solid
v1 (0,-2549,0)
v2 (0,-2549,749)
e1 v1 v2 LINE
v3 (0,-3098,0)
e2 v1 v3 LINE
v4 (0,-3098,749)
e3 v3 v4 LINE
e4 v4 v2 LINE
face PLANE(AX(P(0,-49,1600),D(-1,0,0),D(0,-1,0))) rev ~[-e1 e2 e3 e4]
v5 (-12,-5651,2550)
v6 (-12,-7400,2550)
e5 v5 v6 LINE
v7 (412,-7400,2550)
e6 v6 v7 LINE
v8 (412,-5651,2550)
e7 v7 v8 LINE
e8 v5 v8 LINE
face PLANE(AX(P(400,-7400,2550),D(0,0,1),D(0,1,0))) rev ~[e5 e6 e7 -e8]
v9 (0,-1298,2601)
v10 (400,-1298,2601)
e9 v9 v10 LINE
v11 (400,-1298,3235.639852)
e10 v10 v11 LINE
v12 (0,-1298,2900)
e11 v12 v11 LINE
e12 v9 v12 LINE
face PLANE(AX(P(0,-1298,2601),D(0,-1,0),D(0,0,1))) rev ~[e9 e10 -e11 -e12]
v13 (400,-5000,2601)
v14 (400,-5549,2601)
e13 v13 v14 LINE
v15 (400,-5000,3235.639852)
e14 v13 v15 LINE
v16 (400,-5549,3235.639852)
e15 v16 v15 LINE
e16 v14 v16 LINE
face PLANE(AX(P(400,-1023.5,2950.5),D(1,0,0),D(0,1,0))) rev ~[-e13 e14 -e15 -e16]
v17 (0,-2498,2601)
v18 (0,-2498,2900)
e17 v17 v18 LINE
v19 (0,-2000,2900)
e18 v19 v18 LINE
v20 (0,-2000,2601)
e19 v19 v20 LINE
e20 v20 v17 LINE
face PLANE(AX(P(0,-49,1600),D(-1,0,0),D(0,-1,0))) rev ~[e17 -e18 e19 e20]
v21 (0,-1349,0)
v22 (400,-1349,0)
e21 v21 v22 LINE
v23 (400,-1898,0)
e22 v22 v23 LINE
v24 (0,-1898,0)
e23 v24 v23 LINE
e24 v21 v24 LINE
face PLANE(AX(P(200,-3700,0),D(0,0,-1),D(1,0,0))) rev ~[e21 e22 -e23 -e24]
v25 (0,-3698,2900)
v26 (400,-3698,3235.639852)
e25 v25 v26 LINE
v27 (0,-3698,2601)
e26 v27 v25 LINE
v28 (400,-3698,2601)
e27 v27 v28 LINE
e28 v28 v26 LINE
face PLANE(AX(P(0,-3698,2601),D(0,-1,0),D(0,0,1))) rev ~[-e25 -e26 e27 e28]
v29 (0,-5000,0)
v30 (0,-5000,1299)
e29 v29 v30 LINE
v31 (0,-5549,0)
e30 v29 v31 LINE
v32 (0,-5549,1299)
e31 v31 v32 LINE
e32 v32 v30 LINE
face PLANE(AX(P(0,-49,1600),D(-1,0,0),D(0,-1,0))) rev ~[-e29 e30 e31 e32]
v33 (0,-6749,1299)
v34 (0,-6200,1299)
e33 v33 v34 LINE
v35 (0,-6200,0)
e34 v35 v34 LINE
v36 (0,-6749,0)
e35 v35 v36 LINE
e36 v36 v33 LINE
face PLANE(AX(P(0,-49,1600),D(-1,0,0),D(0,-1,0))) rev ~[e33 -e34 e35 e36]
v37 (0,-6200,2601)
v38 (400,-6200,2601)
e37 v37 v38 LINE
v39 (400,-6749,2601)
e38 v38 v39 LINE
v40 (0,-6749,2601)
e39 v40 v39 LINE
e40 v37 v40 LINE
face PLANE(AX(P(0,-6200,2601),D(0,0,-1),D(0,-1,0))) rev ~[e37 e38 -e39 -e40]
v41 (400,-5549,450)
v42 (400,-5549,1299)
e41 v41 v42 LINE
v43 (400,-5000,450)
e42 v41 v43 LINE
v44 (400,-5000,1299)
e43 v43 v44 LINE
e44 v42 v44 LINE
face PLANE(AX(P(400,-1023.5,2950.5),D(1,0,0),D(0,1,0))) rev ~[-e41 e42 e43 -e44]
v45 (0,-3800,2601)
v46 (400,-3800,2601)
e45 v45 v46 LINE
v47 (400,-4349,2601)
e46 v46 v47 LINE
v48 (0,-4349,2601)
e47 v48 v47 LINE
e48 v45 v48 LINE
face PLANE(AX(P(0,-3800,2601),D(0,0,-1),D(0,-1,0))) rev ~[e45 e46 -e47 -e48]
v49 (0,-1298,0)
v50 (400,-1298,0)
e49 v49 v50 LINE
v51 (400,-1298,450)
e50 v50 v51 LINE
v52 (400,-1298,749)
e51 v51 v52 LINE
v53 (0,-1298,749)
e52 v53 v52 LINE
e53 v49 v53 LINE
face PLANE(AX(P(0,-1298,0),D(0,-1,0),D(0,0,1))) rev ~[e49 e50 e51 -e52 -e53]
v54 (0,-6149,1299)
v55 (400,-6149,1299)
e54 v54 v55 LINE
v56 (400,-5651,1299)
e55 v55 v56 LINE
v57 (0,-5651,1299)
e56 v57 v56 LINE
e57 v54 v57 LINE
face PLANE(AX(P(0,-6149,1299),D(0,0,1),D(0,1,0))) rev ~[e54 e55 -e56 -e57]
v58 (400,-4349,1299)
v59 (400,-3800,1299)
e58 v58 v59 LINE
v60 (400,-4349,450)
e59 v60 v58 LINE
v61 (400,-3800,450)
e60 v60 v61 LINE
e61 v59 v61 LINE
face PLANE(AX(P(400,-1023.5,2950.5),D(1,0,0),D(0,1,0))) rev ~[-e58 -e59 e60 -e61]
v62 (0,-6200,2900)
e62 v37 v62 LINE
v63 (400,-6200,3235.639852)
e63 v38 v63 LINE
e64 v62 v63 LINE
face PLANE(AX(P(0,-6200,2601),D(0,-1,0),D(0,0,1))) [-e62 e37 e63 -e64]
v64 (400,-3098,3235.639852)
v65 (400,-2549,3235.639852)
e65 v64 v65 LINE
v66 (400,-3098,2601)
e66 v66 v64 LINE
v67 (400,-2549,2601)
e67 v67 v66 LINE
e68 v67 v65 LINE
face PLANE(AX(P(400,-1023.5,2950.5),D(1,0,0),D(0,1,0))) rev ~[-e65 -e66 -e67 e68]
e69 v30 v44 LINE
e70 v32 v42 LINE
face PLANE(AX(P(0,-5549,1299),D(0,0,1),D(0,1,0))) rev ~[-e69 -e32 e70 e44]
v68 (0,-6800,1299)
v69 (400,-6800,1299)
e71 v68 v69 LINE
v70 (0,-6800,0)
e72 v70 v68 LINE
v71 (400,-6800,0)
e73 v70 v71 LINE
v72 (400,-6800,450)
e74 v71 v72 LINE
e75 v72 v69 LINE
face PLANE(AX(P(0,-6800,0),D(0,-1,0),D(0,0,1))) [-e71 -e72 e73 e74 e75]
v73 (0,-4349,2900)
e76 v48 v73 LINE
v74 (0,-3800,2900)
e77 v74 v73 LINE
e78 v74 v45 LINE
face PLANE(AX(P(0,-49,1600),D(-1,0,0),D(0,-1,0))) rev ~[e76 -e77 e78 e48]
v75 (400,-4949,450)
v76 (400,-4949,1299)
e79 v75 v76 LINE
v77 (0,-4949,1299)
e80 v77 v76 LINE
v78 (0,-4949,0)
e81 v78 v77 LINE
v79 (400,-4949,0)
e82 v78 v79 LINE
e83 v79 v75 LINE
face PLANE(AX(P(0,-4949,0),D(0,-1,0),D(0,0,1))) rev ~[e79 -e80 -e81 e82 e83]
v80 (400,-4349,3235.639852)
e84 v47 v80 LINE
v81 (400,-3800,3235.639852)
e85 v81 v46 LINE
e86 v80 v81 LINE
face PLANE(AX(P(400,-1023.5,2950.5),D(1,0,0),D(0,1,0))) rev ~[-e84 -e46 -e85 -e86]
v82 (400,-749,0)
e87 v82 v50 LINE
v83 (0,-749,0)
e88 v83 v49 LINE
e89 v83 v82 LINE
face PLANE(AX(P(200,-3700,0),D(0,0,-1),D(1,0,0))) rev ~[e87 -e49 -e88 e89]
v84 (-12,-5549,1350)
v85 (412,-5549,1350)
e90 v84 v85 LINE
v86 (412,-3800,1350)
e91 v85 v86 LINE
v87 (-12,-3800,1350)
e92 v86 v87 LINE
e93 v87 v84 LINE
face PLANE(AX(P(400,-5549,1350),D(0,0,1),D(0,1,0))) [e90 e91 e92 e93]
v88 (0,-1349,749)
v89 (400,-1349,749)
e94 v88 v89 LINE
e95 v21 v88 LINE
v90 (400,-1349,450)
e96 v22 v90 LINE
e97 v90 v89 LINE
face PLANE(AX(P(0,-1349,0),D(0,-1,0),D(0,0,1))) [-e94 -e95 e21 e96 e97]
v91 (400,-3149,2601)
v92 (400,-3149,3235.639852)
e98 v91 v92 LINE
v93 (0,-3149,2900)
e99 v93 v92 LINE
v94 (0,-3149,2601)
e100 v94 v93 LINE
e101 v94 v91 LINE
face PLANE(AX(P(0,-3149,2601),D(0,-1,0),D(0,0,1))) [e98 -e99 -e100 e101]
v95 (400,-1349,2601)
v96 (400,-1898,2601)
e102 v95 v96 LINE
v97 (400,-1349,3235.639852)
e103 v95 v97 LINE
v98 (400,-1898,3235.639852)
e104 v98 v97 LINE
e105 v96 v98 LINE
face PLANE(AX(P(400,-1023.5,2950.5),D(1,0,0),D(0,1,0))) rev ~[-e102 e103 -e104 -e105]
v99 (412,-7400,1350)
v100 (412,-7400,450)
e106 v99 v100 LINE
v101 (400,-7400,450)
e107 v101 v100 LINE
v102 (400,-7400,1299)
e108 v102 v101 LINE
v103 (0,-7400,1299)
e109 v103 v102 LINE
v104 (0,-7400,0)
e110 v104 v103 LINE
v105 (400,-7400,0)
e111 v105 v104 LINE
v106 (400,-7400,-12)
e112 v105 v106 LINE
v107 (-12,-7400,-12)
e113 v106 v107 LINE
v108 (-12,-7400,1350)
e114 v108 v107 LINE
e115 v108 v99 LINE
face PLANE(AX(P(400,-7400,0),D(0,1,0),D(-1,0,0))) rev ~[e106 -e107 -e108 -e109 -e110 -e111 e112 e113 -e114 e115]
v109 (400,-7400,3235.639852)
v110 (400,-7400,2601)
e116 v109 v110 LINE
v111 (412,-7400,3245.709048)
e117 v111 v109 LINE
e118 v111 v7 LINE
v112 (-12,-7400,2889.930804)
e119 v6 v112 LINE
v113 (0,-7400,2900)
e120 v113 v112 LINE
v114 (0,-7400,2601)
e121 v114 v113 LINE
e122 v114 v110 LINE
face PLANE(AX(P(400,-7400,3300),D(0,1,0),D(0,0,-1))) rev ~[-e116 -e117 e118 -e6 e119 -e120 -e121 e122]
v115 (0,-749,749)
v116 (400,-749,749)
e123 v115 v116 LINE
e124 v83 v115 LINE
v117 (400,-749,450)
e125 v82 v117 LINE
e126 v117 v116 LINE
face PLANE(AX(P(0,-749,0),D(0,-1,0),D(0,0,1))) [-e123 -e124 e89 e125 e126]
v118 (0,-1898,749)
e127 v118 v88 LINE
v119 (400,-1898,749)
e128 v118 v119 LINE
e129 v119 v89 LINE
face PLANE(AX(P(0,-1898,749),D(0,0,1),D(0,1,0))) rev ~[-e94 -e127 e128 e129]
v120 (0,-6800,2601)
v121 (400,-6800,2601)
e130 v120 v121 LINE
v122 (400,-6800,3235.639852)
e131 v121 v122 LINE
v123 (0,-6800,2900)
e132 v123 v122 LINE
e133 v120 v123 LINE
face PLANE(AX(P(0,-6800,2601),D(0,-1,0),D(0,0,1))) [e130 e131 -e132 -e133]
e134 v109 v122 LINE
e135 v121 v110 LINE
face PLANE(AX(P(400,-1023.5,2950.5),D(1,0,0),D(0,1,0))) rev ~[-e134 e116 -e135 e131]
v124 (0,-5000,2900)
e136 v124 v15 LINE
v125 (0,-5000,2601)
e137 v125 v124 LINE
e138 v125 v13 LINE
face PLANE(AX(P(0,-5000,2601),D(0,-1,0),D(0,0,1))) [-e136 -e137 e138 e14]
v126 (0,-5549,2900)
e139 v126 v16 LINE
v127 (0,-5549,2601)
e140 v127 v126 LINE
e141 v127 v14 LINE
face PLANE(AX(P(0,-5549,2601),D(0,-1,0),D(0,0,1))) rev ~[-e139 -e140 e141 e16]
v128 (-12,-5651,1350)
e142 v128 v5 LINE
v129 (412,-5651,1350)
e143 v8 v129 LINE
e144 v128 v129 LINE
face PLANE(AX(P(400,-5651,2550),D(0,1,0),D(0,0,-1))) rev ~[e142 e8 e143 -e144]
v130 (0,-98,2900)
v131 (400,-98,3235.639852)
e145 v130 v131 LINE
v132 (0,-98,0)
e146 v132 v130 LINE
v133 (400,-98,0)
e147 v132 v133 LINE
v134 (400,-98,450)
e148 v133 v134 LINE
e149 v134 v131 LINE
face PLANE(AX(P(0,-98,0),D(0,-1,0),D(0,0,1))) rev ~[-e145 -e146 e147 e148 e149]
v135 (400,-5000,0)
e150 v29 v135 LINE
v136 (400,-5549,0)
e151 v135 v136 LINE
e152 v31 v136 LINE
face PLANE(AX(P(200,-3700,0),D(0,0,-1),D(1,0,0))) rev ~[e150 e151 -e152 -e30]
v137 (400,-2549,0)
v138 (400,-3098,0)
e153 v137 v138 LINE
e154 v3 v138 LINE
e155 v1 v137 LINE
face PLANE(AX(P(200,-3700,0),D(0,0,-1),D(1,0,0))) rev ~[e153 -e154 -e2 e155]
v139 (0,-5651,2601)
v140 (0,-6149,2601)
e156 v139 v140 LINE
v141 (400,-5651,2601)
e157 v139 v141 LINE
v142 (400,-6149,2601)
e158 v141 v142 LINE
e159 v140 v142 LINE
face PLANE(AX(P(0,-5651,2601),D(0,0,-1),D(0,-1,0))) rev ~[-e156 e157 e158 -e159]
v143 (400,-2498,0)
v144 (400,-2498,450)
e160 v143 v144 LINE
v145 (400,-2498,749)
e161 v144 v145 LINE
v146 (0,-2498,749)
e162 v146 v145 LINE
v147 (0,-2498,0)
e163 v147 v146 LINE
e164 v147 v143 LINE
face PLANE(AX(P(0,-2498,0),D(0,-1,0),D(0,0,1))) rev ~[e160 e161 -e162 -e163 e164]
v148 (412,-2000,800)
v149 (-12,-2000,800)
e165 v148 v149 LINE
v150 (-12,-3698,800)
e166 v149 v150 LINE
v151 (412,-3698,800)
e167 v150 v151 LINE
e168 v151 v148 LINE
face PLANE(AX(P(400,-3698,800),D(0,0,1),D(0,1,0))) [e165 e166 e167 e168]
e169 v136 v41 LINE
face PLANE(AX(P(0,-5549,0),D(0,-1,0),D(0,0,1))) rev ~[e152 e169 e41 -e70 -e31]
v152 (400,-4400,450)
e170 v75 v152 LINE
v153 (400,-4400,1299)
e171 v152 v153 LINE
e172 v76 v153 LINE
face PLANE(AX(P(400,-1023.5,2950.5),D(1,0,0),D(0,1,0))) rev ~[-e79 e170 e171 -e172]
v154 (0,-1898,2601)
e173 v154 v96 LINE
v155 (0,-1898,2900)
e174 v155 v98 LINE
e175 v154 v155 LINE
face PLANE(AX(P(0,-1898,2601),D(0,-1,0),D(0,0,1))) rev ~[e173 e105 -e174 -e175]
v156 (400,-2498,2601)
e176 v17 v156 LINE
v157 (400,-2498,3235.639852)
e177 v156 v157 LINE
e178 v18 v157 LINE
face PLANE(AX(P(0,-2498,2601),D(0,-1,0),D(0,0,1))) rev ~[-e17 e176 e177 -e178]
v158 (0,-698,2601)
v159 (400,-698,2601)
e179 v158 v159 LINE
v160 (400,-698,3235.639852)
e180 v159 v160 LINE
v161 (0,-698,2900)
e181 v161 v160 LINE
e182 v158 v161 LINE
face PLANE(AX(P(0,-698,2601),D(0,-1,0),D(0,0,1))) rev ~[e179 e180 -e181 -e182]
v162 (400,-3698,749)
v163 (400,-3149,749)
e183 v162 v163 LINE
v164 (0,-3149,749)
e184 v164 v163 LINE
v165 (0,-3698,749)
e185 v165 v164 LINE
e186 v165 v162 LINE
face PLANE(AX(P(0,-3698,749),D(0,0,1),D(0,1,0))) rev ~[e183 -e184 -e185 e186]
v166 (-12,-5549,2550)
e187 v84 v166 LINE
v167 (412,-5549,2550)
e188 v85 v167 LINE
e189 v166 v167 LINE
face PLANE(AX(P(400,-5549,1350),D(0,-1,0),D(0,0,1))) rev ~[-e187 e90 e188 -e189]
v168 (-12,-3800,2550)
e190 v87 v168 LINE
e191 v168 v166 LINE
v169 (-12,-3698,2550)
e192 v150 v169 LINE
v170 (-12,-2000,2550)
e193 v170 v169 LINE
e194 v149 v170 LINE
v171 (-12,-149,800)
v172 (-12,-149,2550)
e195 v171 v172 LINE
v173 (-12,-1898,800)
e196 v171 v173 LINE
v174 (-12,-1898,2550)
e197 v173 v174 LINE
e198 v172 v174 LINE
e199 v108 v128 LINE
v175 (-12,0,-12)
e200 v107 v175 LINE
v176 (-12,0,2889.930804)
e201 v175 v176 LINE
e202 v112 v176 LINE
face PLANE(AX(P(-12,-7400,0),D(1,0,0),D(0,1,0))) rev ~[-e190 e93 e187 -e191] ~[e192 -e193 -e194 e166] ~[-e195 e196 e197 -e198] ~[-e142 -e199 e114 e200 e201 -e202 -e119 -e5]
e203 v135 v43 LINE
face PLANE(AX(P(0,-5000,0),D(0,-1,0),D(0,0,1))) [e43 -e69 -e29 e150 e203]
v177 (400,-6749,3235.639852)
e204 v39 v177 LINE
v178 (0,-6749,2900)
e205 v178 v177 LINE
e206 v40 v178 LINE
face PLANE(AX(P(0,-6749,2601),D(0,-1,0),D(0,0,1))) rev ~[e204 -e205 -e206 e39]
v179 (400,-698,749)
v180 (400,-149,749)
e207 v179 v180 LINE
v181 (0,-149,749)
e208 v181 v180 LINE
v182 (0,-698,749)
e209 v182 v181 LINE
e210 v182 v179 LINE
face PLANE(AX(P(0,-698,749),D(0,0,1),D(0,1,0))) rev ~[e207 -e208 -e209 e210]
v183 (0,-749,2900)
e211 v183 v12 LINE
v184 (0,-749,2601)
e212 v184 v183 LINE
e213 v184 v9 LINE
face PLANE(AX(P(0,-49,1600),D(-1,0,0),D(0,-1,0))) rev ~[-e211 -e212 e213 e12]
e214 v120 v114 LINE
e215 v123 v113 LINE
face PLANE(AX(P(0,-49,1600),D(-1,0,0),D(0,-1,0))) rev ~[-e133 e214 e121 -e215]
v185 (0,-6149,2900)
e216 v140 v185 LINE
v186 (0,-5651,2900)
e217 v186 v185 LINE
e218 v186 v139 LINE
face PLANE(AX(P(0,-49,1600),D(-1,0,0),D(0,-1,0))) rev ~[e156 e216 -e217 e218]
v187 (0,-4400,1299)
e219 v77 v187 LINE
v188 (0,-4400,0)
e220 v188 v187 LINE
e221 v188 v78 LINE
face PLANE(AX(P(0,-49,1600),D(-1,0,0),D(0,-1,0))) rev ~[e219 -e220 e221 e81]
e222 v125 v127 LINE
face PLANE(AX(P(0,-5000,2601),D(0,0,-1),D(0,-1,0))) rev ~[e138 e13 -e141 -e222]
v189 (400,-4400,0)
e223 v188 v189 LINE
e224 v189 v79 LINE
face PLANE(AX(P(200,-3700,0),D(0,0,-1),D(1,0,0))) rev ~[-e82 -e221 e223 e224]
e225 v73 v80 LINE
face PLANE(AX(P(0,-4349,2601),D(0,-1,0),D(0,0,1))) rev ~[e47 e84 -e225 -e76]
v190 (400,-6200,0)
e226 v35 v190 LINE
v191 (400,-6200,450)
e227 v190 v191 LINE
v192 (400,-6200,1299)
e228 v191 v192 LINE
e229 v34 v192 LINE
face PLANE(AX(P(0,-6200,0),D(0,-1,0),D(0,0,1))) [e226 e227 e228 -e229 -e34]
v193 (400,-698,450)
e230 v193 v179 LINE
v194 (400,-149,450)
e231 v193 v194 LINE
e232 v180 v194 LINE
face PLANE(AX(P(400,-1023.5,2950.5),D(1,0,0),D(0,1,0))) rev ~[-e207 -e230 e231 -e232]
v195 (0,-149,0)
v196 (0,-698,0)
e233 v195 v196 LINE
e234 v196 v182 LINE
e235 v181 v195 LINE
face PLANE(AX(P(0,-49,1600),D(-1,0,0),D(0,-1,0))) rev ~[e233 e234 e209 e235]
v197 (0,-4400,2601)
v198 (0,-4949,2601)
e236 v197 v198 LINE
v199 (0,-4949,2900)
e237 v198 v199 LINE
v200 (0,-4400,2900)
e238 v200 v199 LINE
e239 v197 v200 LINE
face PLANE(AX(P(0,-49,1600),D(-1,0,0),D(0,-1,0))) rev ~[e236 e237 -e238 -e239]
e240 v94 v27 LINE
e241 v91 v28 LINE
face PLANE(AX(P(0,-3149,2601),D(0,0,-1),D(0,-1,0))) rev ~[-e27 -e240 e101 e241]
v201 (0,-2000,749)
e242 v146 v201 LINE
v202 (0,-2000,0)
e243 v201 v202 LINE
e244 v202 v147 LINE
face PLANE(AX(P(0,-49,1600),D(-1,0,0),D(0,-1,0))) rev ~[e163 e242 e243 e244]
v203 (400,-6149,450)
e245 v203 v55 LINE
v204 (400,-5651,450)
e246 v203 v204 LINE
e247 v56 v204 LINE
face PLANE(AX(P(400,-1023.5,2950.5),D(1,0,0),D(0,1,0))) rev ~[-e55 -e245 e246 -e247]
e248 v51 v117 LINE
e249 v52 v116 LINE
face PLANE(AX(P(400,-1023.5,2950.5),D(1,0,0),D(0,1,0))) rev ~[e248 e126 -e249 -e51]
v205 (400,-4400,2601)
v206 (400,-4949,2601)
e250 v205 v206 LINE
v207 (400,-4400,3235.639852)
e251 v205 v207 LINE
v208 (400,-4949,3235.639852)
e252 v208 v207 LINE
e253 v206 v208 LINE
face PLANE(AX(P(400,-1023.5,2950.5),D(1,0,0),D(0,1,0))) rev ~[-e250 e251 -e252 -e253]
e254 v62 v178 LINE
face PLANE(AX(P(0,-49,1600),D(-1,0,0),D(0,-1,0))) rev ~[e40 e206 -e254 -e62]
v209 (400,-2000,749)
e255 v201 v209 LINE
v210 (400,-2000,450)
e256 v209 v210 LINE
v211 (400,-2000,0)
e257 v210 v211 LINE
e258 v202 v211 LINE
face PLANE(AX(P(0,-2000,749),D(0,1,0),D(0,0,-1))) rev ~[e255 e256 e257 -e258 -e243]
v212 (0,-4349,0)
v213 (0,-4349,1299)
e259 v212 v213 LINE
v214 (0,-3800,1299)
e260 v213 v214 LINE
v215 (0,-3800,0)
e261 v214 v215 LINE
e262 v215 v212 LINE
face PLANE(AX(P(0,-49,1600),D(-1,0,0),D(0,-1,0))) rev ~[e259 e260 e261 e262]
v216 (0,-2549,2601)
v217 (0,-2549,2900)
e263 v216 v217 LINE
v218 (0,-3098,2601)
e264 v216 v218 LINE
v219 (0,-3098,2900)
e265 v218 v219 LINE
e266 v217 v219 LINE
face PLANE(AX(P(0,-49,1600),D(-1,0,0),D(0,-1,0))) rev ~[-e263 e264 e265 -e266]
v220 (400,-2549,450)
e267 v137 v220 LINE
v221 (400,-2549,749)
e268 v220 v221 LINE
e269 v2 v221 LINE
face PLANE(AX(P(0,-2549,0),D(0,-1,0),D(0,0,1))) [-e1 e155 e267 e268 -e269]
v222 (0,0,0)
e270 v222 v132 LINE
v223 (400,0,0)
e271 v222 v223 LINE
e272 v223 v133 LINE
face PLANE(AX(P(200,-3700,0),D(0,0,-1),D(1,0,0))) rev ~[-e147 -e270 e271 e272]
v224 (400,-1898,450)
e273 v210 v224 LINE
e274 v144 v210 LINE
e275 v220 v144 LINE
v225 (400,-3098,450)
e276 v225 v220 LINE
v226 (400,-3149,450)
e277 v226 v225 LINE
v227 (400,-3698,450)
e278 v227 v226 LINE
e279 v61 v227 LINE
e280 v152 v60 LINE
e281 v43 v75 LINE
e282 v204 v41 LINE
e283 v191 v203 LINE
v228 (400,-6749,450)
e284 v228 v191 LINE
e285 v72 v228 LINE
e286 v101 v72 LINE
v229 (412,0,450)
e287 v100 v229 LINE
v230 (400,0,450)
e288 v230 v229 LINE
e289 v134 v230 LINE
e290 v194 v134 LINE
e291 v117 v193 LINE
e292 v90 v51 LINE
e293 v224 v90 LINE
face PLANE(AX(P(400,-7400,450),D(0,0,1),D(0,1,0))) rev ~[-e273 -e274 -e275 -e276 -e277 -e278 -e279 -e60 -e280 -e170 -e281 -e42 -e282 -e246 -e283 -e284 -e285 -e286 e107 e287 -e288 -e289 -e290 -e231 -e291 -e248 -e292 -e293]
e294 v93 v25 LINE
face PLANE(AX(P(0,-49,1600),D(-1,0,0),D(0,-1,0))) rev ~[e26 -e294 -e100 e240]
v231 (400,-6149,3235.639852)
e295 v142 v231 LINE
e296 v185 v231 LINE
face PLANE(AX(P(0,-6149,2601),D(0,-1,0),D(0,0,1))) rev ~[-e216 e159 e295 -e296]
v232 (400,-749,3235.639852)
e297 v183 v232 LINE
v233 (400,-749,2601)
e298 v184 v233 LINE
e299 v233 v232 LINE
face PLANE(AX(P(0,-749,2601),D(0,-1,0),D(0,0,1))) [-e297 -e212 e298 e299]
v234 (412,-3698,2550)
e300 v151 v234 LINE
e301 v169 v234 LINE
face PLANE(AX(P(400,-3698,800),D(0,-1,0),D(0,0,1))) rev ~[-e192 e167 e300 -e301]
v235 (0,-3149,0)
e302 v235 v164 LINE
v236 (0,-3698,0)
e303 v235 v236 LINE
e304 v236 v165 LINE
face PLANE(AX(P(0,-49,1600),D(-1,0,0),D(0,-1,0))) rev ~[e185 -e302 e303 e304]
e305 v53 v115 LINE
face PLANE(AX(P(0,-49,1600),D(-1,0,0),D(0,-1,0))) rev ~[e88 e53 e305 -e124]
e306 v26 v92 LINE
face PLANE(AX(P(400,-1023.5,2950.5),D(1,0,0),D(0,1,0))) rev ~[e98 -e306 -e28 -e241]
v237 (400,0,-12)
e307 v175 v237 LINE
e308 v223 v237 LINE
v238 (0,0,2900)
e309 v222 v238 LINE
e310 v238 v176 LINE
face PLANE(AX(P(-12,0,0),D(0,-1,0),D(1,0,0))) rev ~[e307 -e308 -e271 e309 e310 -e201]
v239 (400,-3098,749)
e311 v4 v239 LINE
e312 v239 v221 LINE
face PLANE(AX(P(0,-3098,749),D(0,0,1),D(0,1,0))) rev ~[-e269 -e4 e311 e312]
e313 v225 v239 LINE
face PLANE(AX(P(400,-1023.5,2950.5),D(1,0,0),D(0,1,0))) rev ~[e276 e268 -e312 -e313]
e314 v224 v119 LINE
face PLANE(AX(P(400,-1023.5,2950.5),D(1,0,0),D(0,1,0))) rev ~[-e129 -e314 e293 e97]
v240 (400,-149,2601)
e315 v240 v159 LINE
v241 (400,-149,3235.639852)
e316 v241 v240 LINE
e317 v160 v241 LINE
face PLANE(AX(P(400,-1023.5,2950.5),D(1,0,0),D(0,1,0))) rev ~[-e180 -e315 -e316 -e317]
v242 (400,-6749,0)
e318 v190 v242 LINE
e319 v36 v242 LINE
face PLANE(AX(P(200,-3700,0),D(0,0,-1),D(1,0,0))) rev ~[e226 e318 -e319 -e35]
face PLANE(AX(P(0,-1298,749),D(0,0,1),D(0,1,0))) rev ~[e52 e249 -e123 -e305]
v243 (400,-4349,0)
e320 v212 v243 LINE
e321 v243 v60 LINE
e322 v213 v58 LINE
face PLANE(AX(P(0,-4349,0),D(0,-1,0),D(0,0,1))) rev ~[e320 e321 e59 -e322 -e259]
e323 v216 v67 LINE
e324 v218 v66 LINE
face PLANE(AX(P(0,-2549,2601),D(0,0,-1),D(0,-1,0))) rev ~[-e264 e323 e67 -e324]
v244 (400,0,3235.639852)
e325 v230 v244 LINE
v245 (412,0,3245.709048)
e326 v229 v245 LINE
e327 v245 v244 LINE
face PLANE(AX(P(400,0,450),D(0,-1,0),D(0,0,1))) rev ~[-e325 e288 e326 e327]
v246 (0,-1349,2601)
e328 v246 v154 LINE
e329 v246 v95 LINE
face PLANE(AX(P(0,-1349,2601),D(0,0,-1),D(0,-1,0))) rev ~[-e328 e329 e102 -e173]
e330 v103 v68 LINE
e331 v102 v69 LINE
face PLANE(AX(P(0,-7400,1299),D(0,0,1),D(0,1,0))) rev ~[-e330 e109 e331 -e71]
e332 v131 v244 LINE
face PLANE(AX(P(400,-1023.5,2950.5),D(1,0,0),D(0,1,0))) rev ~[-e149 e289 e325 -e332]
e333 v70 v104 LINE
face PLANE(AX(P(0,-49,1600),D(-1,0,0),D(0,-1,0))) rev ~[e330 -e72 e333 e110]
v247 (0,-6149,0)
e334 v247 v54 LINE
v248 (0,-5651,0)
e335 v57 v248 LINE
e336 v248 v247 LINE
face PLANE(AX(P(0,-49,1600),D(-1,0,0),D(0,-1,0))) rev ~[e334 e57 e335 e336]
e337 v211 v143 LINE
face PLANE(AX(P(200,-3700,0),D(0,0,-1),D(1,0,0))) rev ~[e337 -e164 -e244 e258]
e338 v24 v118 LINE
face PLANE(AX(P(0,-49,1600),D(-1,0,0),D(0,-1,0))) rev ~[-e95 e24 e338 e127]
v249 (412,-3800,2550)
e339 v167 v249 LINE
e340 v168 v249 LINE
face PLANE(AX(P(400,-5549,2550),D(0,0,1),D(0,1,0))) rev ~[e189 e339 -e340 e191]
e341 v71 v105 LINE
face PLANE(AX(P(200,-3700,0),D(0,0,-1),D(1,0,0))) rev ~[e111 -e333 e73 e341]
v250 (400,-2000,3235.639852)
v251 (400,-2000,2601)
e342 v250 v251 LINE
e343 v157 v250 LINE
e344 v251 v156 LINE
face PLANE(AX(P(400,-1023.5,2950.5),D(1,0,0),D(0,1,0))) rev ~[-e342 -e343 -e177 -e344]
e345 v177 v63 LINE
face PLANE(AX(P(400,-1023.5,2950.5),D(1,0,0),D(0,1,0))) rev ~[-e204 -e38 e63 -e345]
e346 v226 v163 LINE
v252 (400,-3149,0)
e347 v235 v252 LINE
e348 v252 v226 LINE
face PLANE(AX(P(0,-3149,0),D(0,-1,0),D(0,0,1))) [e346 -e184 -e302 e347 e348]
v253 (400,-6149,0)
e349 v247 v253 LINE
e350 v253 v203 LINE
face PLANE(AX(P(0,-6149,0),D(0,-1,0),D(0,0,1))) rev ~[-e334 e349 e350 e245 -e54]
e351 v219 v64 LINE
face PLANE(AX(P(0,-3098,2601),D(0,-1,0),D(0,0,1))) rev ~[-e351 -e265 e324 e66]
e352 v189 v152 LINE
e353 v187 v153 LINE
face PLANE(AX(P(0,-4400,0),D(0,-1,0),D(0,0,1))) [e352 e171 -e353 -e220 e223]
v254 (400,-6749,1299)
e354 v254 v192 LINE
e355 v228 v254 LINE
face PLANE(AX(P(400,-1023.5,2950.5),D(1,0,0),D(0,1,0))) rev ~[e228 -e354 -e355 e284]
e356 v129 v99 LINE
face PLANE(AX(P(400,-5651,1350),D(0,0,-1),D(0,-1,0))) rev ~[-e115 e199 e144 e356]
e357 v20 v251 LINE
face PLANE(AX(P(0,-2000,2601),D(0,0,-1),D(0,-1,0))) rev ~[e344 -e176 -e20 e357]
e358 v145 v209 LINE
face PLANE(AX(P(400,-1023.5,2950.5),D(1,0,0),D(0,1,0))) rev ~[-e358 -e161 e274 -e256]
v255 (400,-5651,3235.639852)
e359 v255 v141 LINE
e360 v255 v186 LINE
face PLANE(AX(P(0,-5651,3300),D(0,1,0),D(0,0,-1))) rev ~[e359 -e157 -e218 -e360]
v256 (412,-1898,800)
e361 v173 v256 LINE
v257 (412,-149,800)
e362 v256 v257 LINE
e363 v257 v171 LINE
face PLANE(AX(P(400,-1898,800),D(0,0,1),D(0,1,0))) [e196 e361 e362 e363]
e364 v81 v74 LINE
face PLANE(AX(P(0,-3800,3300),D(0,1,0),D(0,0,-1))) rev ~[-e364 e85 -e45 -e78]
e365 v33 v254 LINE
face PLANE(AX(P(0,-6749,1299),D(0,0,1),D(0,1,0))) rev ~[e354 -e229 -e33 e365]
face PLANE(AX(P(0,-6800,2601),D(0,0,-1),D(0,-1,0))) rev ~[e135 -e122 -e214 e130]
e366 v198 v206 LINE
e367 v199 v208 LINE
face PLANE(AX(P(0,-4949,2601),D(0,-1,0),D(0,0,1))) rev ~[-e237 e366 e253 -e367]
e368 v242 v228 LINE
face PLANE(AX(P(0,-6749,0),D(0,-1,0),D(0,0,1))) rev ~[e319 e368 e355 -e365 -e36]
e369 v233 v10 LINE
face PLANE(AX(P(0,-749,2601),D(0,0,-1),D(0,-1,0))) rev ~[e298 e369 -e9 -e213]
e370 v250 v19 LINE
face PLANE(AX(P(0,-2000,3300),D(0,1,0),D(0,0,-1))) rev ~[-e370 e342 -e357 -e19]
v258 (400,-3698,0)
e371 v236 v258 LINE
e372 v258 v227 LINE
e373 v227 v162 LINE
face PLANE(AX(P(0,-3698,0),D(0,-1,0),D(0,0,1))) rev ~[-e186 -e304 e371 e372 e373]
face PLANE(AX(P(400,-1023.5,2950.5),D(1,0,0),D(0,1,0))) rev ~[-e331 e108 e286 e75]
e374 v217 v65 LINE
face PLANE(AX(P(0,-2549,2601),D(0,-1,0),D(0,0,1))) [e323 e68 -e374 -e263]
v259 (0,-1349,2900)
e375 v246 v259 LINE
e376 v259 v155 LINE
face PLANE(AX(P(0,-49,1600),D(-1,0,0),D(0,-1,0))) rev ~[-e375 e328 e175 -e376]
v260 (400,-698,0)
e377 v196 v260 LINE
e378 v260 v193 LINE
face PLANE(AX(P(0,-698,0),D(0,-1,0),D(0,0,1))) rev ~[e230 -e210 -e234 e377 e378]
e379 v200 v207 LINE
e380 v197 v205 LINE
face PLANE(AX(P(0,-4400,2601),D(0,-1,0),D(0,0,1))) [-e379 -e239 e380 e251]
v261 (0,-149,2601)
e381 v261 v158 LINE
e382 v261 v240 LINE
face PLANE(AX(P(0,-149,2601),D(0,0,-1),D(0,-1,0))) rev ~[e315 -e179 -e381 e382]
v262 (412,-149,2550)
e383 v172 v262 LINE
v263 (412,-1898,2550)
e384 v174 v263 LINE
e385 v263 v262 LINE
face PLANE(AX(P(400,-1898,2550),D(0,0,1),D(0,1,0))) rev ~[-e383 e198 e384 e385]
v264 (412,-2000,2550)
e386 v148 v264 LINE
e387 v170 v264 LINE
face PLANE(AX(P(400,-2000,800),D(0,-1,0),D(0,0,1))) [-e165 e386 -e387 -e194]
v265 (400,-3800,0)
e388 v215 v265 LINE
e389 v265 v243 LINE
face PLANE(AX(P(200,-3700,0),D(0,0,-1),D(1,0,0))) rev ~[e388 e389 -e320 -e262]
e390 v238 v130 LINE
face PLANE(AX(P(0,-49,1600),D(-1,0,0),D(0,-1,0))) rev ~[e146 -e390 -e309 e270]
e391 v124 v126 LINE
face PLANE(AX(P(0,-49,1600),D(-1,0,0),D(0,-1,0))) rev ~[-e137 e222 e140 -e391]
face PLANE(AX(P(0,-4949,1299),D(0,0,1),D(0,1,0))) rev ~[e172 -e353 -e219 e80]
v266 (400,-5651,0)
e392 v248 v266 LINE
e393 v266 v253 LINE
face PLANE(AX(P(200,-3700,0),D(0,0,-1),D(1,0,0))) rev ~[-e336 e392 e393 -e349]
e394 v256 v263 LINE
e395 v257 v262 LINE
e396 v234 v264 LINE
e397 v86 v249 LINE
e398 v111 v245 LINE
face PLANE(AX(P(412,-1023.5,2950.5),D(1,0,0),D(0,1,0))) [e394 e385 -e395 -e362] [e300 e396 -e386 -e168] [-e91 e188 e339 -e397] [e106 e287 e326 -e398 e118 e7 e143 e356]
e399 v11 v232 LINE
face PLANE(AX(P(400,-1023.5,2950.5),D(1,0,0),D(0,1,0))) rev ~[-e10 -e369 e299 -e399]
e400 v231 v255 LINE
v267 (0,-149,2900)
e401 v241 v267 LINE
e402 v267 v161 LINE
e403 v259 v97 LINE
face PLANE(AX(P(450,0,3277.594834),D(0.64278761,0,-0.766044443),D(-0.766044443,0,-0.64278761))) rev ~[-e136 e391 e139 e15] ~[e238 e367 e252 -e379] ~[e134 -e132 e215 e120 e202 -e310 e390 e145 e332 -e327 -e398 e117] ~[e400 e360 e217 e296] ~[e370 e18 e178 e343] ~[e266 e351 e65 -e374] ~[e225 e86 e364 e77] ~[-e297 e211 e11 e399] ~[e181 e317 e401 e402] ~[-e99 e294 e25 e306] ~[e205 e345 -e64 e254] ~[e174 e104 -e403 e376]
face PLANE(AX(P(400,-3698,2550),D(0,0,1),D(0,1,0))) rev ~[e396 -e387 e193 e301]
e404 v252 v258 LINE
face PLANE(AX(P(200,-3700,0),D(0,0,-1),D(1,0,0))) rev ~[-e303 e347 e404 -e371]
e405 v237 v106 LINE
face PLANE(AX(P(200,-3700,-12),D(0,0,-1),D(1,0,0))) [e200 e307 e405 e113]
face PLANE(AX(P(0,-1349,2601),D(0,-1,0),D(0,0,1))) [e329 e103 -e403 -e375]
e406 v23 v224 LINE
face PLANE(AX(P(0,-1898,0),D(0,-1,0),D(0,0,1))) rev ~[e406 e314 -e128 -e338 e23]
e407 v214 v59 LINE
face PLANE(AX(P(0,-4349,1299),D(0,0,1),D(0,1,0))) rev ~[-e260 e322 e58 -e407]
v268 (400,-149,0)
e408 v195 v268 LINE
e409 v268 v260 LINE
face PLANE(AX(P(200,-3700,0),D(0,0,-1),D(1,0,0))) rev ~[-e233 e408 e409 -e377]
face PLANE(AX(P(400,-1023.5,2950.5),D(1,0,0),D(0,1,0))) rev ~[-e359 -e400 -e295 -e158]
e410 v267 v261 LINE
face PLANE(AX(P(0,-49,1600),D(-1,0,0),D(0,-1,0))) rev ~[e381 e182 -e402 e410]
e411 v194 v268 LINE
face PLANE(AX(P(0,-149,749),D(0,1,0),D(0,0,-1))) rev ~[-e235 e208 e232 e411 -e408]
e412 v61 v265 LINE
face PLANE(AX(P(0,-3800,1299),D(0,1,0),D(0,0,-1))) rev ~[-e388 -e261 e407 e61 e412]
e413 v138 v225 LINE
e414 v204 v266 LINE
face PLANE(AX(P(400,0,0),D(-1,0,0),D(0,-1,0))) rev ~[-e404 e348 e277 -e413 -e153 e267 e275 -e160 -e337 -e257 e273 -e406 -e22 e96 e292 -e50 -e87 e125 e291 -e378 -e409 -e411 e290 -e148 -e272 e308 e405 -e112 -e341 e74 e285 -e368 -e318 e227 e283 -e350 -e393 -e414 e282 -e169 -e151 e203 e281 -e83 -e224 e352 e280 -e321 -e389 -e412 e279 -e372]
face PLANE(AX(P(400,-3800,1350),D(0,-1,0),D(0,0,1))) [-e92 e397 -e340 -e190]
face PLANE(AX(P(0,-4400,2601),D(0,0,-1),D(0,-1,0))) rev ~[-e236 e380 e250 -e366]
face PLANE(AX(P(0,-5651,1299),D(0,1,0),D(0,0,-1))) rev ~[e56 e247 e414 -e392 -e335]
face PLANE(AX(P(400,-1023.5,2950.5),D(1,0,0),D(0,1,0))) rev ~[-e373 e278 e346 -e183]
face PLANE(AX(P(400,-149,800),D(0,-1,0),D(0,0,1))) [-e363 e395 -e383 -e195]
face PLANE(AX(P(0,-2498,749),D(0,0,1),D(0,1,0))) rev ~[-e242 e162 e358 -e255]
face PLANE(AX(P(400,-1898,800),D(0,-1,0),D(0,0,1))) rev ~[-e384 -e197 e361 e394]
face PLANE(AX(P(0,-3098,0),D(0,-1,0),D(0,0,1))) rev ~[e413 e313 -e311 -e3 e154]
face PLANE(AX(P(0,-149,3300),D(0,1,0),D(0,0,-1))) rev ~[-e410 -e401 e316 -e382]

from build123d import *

# Parameters (mm, degrees)
F0_W     = 51
F0_H     = 749
F0_H_2   = 1299
F0_H_3   = 699
F1_DEPTH = 400
F2_W     = 98
F2_H     = 3200
F2_W_2   = 549
F2_H_2   = 749
F2_W_3   = 498
F2_H_3   = 1299
F2_W_4   = 600
F2_H_4   = 599
F2_W_5   = 1749
F2_H_5   = 1750
F2_W_6   = 1698
F2_H_6   = 1200
F3_DEPTH = 12
F4_W     = 549
F4_H     = 699
F4_W_2   = 498
F4_W_3   = 600
F4_W_4   = 98
F4_H_2   = 2850
F4_H_3   = 849
F4_H_4   = 299
F4_W_5   = 1749
F4_H_5   = 1200
F4_W_6   = 1698
F4_H_6   = 1750
F5_DEPTH = 12
F6_W     = 400
F6_H     = 7400
F7_DEPTH = 12
F9_DEPTH = 7400.001


# Not quite as in the source:
# - a feature names something its author has since deleted; it is built from what else it names


with BuildPart() as f1:
    # F0 (on Right) → F1 (new body)
    with BuildSketch(Plane.YZ):
        Polygon((-149, 0), (-98, 0), (-98, 3300), (-149, 3300), (-149, 2601), (-149, 2550), (-149, 800), (-149, 749), align=None)
        with Locations((-1323.5, 374.5)):
            Rectangle(F0_W, F0_H)
        with Locations((-2523.5, 374.5)):
            Rectangle(F0_W, F0_H)
        with Locations((-3123.5, 374.5)):
            Rectangle(F0_W, F0_H)
        with Locations((-4374.5, 649.5)):
            Rectangle(F0_W, F0_H_2)
        with Locations((-4974.5, 649.5)):
            Rectangle(F0_W, F0_H_2)
        with Locations((-6174.5, 649.5)):
            Rectangle(F0_W, F0_H_2)
        with Locations((-6774.5, 649.5)):
            Rectangle(F0_W, F0_H_2)
        with Locations((-1323.5, 2950.5)):
            Rectangle(F0_W, F0_H_3)
        with Locations((-2523.5, 2950.5)):
            Rectangle(F0_W, F0_H_3)
        with Locations((-3123.5, 2950.5)):
            Rectangle(F0_W, F0_H_3)
        with Locations((-4374.5, 2950.5)):
            Rectangle(F0_W, F0_H_3)
        with Locations((-4974.5, 2950.5)):
            Rectangle(F0_W, F0_H_3)
        with Locations((-6174.5, 2950.5)):
            Rectangle(F0_W, F0_H_3)
        with Locations((-6774.5, 2950.5)):
            Rectangle(F0_W, F0_H_3)
        with Locations((-723.5, 374.5)):
            Rectangle(F0_W, F0_H)
        Polygon((-1898, 749), (-1898, 800), (-1898, 2550), (-1898, 2601), (-1898, 3300), (-1949, 3300), (-1949, 0), (-1898, 0), align=None)
        Polygon((-2000, 0), (-1949, 0), (-1949, 3300), (-2000, 3300), (-2000, 2601), (-2000, 2550), (-2000, 800), (-2000, 749), align=None)
        Polygon((-3698, 749), (-3698, 800), (-3698, 2550), (-3698, 2601), (-3698, 3300), (-3749, 3300), (-3749, 0), (-3698, 0), align=None)
        Polygon((-3800, 0), (-3749, 0), (-3749, 3300), (-3800, 3300), (-3800, 2601), (-3800, 2550), (-3800, 1350), (-3800, 1299), align=None)
        Polygon((-5549, 1299), (-5549, 1350), (-5549, 2550), (-5549, 2601), (-5549, 3300), (-5600, 3300), (-5600, 0), (-5549, 0), align=None)
        Polygon((-5651, 0), (-5600, 0), (-5600, 3300), (-5651, 3300), (-5651, 2601), (-5651, 2550), (-5651, 1350), (-5651, 1299), align=None)
        Polygon((-6149, 1299), (-5651, 1299), (-5651, 1350), (-7400, 1350), (-7400, 1299), (-6800, 1299), (-6749, 1299), (-6200, 1299), align=None)
        Polygon((-5651, 2550), (-5651, 2601), (-6149, 2601), (-6200, 2601), (-6749, 2601), (-6800, 2601), (-7400, 2601), (-7400, 2550), align=None)
        Polygon((-698, 749), (-149, 749), (-149, 800), (-1898, 800), (-1898, 749), (-1349, 749), (-1298, 749), (-749, 749), align=None)
        Polygon((-2498, 749), (-2000, 749), (-2000, 800), (-3698, 800), (-3698, 749), (-3149, 749), (-3098, 749), (-2549, 749), align=None)
        Polygon((-4349, 1299), (-3800, 1299), (-3800, 1350), (-5549, 1350), (-5549, 1299), (-5000, 1299), (-4949, 1299), (-4400, 1299), align=None)
        Polygon((-3800, 2550), (-3800, 2601), (-4349, 2601), (-4400, 2601), (-4949, 2601), (-5000, 2601), (-5549, 2601), (-5549, 2550), align=None)
        Polygon((-149, 2550), (-149, 2601), (-698, 2601), (-749, 2601), (-1298, 2601), (-1349, 2601), (-1898, 2601), (-1898, 2550), align=None)
        Polygon((-2000, 2550), (-2000, 2601), (-2498, 2601), (-2549, 2601), (-3098, 2601), (-3149, 2601), (-3698, 2601), (-3698, 2550), align=None)
        with Locations((-723.5, 2950.5)):
            Rectangle(F0_W, F0_H_3)
    extrude(amount=F1_DEPTH)

    # F2 (on face) → F3 (join)
    with BuildSketch(Plane(origin=(0, 0, 0), x_dir=(0, -1, 0), z_dir=(-1, 0, 0))):
        with Locations((49, 1600)):
            Rectangle(F2_W, F2_H)
        with Locations((1023.5, 374.5)):
            Rectangle(F2_W_2, F2_H_2)
        with Locations((1623.5, 374.5)):
            Rectangle(F2_W_2, F2_H_2)
        with Locations((2249, 374.5)):
            Rectangle(F2_W_3, F2_H_2)
        with Locations((2823.5, 374.5)):
            Rectangle(F2_W_2, F2_H_2)
        with Locations((3423.5, 374.5)):
            Rectangle(F2_W_2, F2_H_2)
        with Locations((4074.5, 649.5)):
            Rectangle(F2_W_2, F2_H_3)
        with Locations((4674.5, 649.5)):
            Rectangle(F2_W_2, F2_H_3)
        with Locations((5274.5, 649.5)):
            Rectangle(F2_W_2, F2_H_3)
        with Locations((5900, 649.5)):
            Rectangle(F2_W_3, F2_H_3)
        with Locations((6474.5, 649.5)):
            Rectangle(F2_W_2, F2_H_3)
        with Locations((7100, 649.5)):
            Rectangle(F2_W_4, F2_H_3)
        with Locations((1023.5, 2900.5)):
            Rectangle(F2_W_2, F2_H_4)
        with Locations((1623.5, 2900.5)):
            Rectangle(F2_W_2, F2_H_4)
        with Locations((2249, 2900.5)):
            Rectangle(F2_W_3, F2_H_4)
        with Locations((2823.5, 2900.5)):
            Rectangle(F2_W_2, F2_H_4)
        with Locations((3423.5, 2900.5)):
            Rectangle(F2_W_2, F2_H_4)
        with Locations((4074.5, 2900.5)):
            Rectangle(F2_W_2, F2_H_4)
        with Locations((4674.5, 2900.5)):
            Rectangle(F2_W_2, F2_H_4)
        with Locations((5274.5, 2900.5)):
            Rectangle(F2_W_2, F2_H_4)
        with Locations((5900, 2900.5)):
            Rectangle(F2_W_3, F2_H_4)
        with Locations((6474.5, 2900.5)):
            Rectangle(F2_W_2, F2_H_4)
        with Locations((7100, 2900.5)):
            Rectangle(F2_W_4, F2_H_4)
        with Locations((423.5, 2900.5)):
            Rectangle(F2_W_2, F2_H_4)
        with Locations((423.5, 374.5)):
            Rectangle(F2_W_2, F2_H_2)
        Polygon((98, 3200), (98, 0), (149, 0), (149, 749), (698, 749), (698, 0), (749, 0), (749, 749), (1298, 749), (1298, 0), (1349, 0), (1349, 749), (1898, 749), (1898, 0), (2000, 0), (2000, 749), (2498, 749), (2498, 0), (2549, 0), (2549, 749), (3098, 749), (3098, 0), (3149, 0), (3149, 749), (3698, 749), (3698, 0), (3800, 0), (3800, 1299), (4349, 1299), (4349, 0), (4400, 0), (4400, 1299), (4949, 1299), (4949, 0), (5000, 0), (5000, 1299), (5549, 1299), (5549, 0), (5651, 0), (5651, 1299), (6149, 1299), (6149, 0), (6200, 0), (6200, 1299), (6749, 1299), (6749, 0), (6800, 0), (6800, 1299), (7400, 1299), (7400, 1350), (5651, 1350), (5651, 2550), (7400, 2550), (7400, 2601), (6800, 2601), (6800, 3200), (6749, 3200), (6749, 2601), (6200, 2601), (6200, 3200), (6149, 3200), (6149, 2601), (5651, 2601), (5651, 3200), (5549, 3200), (5549, 2601), (5000, 2601), (5000, 3200), (4949, 3200), (4949, 2601), (4400, 2601), (4400, 3200), (4349, 3200), (4349, 2601), (3800, 2601), (3800, 3200), (3698, 3200), (3698, 2601), (3149, 2601), (3149, 3200), (3098, 3200), (3098, 2601), (2549, 2601), (2549, 3200), (2498, 3200), (2498, 2601), (2000, 2601), (2000, 3200), (1898, 3200), (1898, 2601), (1349, 2601), (1349, 3200), (1298, 3200), (1298, 2601), (749, 2601), (749, 3200), (698, 3200), (698, 2601), (149, 2601), (149, 3200), align=None)
        with Locations((1023.5, 1675)):
            Rectangle(F2_W_5, F2_H_5, mode=Mode.SUBTRACT)
        with Locations((2849, 1675)):
            Rectangle(F2_W_6, F2_H_5, mode=Mode.SUBTRACT)
        with Locations((4674.5, 1950)):
            Rectangle(F2_W_5, F2_H_6, mode=Mode.SUBTRACT)
    extrude(amount=F3_DEPTH)

    # F4 (on face) → F5 (join)
    with BuildSketch(Plane.YZ.offset(400)):
        with Locations((-1023.5, 2950.5)):
            Rectangle(F4_W, F4_H)
        with Locations((-1623.5, 2950.5)):
            Rectangle(F4_W, F4_H)
        with Locations((-2249, 2950.5)):
            Rectangle(F4_W_2, F4_H)
        with Locations((-2823.5, 2950.5)):
            Rectangle(F4_W, F4_H)
        with Locations((-3423.5, 2950.5)):
            Rectangle(F4_W, F4_H)
        with Locations((-4074.5, 2950.5)):
            Rectangle(F4_W, F4_H)
        with Locations((-4674.5, 2950.5)):
            Rectangle(F4_W, F4_H)
        with Locations((-5274.5, 2950.5)):
            Rectangle(F4_W, F4_H)
        with Locations((-5900, 2950.5)):
            Rectangle(F4_W_2, F4_H)
        with Locations((-6474.5, 2950.5)):
            Rectangle(F4_W, F4_H)
        with Locations((-7100, 2950.5)):
            Rectangle(F4_W_3, F4_H)
        with Locations((-49, 1875)):
            Rectangle(F4_W_4, F4_H_2)
        with Locations((-7100, 874.5)):
            Rectangle(F4_W_3, F4_H_3)
        with Locations((-2249, 599.5)):
            Rectangle(F4_W_2, F4_H_4)
        with Locations((-2823.5, 599.5)):
            Rectangle(F4_W, F4_H_4)
        with Locations((-3423.5, 599.5)):
            Rectangle(F4_W, F4_H_4)
        with Locations((-4074.5, 874.5)):
            Rectangle(F4_W, F4_H_3)
        with Locations((-4674.5, 874.5)):
            Rectangle(F4_W, F4_H_3)
        with Locations((-5274.5, 874.5)):
            Rectangle(F4_W, F4_H_3)
        with Locations((-5900, 874.5)):
            Rectangle(F4_W_2, F4_H_3)
        with Locations((-6474.5, 874.5)):
            Rectangle(F4_W, F4_H_3)
        Polygon((-149, 450), (-98, 450), (-98, 3300), (-149, 3300), (-149, 2601), (-698, 2601), (-698, 3300), (-749, 3300), (-749, 2601), (-1298, 2601), (-1298, 3300), (-1349, 3300), (-1349, 2601), (-1898, 2601), (-1898, 3300), (-2000, 3300), (-2000, 2601), (-2498, 2601), (-2498, 3300), (-2549, 3300), (-2549, 2601), (-3098, 2601), (-3098, 3300), (-3149, 3300), (-3149, 2601), (-3698, 2601), (-3698, 3300), (-3800, 3300), (-3800, 2601), (-4349, 2601), (-4349, 3300), (-4400, 3300), (-4400, 2601), (-4949, 2601), (-4949, 3300), (-5000, 3300), (-5000, 2601), (-5549, 2601), (-5549, 3300), (-5651, 3300), (-5651, 2601), (-6149, 2601), (-6149, 3300), (-6200, 3300), (-6200, 2601), (-6749, 2601), (-6749, 3300), (-6800, 3300), (-6800, 2601), (-7400, 2601), (-7400, 2550), (-5651, 2550), (-5651, 1350), (-7400, 1350), (-7400, 1299), (-6800, 1299), (-6800, 450), (-6749, 450), (-6749, 1299), (-6200, 1299), (-6200, 450), (-6149, 450), (-6149, 1299), (-5651, 1299), (-5651, 450), (-5549, 450), (-5549, 1299), (-5000, 1299), (-5000, 450), (-4949, 450), (-4949, 1299), (-4400, 1299), (-4400, 450), (-4349, 450), (-4349, 1299), (-3800, 1299), (-3800, 450), (-3698, 450), (-3698, 749), (-3149, 749), (-3149, 450), (-3098, 450), (-3098, 749), (-2549, 749), (-2549, 450), (-2498, 450), (-2498, 749), (-2000, 749), (-2000, 450), (-1898, 450), (-1898, 749), (-1349, 749), (-1349, 450), (-1298, 450), (-1298, 749), (-749, 749), (-749, 450), (-698, 450), (-698, 749), (-149, 749), align=None)
        with Locations((-4674.5, 1950)):
            Rectangle(F4_W_5, F4_H_5, mode=Mode.SUBTRACT)
        with Locations((-2849, 1675)):
            Rectangle(F4_W_6, F4_H_6, mode=Mode.SUBTRACT)
        with Locations((-1023.5, 1675)):
            Rectangle(F4_W_5, F4_H_6, mode=Mode.SUBTRACT)
        with Locations((-1623.5, 599.5)):
            Rectangle(F4_W, F4_H_4)
        with Locations((-1023.5, 599.5)):
            Rectangle(F4_W, F4_H_4)
        with Locations((-423.5, 599.5)):
            Rectangle(F4_W, F4_H_4)
        with Locations((-423.5, 2950.5)):
            Rectangle(F4_W, F4_H)
    extrude(amount=F5_DEPTH)

    # F6 (on face) → F7 (join)
    with BuildSketch(Plane(origin=(0, 0, 0), x_dir=(1, 0, 0), z_dir=(0, 0, -1))):
        with Locations((200, 3700)):
            Rectangle(F6_W, F6_H)
        Polygon((-12, 0), (0, 0), (0, 98), (0, 149), (0, 698), (0, 749), (0, 1298), (0, 1349), (0, 1898), (0, 2000), (0, 2498), (0, 2549), (0, 3098), (0, 3149), (0, 3698), (0, 3800), (0, 4349), (0, 4400), (0, 4949), (0, 5000), (0, 5549), (0, 5651), (0, 6149), (0, 6200), (0, 6749), (0, 6800), (0, 7400), (-12, 7400), align=None)
    extrude(amount=F7_DEPTH)

    # F8 (on face) → F9 (cut, through all)
    with BuildSketch(Plane(origin=(0, 0, 0), x_dir=(-1, 0, 0), z_dir=(0, 1, 0))):
        Polygon((-450, 3277.5948340298), (0, 2900), (50, 2858.0450184411), (50, 3377.5948340298), (-450, 3377.5948340298), align=None)
    extrude(amount=-F9_DEPTH, mode=Mode.SUBTRACT)


solid = f1.part
